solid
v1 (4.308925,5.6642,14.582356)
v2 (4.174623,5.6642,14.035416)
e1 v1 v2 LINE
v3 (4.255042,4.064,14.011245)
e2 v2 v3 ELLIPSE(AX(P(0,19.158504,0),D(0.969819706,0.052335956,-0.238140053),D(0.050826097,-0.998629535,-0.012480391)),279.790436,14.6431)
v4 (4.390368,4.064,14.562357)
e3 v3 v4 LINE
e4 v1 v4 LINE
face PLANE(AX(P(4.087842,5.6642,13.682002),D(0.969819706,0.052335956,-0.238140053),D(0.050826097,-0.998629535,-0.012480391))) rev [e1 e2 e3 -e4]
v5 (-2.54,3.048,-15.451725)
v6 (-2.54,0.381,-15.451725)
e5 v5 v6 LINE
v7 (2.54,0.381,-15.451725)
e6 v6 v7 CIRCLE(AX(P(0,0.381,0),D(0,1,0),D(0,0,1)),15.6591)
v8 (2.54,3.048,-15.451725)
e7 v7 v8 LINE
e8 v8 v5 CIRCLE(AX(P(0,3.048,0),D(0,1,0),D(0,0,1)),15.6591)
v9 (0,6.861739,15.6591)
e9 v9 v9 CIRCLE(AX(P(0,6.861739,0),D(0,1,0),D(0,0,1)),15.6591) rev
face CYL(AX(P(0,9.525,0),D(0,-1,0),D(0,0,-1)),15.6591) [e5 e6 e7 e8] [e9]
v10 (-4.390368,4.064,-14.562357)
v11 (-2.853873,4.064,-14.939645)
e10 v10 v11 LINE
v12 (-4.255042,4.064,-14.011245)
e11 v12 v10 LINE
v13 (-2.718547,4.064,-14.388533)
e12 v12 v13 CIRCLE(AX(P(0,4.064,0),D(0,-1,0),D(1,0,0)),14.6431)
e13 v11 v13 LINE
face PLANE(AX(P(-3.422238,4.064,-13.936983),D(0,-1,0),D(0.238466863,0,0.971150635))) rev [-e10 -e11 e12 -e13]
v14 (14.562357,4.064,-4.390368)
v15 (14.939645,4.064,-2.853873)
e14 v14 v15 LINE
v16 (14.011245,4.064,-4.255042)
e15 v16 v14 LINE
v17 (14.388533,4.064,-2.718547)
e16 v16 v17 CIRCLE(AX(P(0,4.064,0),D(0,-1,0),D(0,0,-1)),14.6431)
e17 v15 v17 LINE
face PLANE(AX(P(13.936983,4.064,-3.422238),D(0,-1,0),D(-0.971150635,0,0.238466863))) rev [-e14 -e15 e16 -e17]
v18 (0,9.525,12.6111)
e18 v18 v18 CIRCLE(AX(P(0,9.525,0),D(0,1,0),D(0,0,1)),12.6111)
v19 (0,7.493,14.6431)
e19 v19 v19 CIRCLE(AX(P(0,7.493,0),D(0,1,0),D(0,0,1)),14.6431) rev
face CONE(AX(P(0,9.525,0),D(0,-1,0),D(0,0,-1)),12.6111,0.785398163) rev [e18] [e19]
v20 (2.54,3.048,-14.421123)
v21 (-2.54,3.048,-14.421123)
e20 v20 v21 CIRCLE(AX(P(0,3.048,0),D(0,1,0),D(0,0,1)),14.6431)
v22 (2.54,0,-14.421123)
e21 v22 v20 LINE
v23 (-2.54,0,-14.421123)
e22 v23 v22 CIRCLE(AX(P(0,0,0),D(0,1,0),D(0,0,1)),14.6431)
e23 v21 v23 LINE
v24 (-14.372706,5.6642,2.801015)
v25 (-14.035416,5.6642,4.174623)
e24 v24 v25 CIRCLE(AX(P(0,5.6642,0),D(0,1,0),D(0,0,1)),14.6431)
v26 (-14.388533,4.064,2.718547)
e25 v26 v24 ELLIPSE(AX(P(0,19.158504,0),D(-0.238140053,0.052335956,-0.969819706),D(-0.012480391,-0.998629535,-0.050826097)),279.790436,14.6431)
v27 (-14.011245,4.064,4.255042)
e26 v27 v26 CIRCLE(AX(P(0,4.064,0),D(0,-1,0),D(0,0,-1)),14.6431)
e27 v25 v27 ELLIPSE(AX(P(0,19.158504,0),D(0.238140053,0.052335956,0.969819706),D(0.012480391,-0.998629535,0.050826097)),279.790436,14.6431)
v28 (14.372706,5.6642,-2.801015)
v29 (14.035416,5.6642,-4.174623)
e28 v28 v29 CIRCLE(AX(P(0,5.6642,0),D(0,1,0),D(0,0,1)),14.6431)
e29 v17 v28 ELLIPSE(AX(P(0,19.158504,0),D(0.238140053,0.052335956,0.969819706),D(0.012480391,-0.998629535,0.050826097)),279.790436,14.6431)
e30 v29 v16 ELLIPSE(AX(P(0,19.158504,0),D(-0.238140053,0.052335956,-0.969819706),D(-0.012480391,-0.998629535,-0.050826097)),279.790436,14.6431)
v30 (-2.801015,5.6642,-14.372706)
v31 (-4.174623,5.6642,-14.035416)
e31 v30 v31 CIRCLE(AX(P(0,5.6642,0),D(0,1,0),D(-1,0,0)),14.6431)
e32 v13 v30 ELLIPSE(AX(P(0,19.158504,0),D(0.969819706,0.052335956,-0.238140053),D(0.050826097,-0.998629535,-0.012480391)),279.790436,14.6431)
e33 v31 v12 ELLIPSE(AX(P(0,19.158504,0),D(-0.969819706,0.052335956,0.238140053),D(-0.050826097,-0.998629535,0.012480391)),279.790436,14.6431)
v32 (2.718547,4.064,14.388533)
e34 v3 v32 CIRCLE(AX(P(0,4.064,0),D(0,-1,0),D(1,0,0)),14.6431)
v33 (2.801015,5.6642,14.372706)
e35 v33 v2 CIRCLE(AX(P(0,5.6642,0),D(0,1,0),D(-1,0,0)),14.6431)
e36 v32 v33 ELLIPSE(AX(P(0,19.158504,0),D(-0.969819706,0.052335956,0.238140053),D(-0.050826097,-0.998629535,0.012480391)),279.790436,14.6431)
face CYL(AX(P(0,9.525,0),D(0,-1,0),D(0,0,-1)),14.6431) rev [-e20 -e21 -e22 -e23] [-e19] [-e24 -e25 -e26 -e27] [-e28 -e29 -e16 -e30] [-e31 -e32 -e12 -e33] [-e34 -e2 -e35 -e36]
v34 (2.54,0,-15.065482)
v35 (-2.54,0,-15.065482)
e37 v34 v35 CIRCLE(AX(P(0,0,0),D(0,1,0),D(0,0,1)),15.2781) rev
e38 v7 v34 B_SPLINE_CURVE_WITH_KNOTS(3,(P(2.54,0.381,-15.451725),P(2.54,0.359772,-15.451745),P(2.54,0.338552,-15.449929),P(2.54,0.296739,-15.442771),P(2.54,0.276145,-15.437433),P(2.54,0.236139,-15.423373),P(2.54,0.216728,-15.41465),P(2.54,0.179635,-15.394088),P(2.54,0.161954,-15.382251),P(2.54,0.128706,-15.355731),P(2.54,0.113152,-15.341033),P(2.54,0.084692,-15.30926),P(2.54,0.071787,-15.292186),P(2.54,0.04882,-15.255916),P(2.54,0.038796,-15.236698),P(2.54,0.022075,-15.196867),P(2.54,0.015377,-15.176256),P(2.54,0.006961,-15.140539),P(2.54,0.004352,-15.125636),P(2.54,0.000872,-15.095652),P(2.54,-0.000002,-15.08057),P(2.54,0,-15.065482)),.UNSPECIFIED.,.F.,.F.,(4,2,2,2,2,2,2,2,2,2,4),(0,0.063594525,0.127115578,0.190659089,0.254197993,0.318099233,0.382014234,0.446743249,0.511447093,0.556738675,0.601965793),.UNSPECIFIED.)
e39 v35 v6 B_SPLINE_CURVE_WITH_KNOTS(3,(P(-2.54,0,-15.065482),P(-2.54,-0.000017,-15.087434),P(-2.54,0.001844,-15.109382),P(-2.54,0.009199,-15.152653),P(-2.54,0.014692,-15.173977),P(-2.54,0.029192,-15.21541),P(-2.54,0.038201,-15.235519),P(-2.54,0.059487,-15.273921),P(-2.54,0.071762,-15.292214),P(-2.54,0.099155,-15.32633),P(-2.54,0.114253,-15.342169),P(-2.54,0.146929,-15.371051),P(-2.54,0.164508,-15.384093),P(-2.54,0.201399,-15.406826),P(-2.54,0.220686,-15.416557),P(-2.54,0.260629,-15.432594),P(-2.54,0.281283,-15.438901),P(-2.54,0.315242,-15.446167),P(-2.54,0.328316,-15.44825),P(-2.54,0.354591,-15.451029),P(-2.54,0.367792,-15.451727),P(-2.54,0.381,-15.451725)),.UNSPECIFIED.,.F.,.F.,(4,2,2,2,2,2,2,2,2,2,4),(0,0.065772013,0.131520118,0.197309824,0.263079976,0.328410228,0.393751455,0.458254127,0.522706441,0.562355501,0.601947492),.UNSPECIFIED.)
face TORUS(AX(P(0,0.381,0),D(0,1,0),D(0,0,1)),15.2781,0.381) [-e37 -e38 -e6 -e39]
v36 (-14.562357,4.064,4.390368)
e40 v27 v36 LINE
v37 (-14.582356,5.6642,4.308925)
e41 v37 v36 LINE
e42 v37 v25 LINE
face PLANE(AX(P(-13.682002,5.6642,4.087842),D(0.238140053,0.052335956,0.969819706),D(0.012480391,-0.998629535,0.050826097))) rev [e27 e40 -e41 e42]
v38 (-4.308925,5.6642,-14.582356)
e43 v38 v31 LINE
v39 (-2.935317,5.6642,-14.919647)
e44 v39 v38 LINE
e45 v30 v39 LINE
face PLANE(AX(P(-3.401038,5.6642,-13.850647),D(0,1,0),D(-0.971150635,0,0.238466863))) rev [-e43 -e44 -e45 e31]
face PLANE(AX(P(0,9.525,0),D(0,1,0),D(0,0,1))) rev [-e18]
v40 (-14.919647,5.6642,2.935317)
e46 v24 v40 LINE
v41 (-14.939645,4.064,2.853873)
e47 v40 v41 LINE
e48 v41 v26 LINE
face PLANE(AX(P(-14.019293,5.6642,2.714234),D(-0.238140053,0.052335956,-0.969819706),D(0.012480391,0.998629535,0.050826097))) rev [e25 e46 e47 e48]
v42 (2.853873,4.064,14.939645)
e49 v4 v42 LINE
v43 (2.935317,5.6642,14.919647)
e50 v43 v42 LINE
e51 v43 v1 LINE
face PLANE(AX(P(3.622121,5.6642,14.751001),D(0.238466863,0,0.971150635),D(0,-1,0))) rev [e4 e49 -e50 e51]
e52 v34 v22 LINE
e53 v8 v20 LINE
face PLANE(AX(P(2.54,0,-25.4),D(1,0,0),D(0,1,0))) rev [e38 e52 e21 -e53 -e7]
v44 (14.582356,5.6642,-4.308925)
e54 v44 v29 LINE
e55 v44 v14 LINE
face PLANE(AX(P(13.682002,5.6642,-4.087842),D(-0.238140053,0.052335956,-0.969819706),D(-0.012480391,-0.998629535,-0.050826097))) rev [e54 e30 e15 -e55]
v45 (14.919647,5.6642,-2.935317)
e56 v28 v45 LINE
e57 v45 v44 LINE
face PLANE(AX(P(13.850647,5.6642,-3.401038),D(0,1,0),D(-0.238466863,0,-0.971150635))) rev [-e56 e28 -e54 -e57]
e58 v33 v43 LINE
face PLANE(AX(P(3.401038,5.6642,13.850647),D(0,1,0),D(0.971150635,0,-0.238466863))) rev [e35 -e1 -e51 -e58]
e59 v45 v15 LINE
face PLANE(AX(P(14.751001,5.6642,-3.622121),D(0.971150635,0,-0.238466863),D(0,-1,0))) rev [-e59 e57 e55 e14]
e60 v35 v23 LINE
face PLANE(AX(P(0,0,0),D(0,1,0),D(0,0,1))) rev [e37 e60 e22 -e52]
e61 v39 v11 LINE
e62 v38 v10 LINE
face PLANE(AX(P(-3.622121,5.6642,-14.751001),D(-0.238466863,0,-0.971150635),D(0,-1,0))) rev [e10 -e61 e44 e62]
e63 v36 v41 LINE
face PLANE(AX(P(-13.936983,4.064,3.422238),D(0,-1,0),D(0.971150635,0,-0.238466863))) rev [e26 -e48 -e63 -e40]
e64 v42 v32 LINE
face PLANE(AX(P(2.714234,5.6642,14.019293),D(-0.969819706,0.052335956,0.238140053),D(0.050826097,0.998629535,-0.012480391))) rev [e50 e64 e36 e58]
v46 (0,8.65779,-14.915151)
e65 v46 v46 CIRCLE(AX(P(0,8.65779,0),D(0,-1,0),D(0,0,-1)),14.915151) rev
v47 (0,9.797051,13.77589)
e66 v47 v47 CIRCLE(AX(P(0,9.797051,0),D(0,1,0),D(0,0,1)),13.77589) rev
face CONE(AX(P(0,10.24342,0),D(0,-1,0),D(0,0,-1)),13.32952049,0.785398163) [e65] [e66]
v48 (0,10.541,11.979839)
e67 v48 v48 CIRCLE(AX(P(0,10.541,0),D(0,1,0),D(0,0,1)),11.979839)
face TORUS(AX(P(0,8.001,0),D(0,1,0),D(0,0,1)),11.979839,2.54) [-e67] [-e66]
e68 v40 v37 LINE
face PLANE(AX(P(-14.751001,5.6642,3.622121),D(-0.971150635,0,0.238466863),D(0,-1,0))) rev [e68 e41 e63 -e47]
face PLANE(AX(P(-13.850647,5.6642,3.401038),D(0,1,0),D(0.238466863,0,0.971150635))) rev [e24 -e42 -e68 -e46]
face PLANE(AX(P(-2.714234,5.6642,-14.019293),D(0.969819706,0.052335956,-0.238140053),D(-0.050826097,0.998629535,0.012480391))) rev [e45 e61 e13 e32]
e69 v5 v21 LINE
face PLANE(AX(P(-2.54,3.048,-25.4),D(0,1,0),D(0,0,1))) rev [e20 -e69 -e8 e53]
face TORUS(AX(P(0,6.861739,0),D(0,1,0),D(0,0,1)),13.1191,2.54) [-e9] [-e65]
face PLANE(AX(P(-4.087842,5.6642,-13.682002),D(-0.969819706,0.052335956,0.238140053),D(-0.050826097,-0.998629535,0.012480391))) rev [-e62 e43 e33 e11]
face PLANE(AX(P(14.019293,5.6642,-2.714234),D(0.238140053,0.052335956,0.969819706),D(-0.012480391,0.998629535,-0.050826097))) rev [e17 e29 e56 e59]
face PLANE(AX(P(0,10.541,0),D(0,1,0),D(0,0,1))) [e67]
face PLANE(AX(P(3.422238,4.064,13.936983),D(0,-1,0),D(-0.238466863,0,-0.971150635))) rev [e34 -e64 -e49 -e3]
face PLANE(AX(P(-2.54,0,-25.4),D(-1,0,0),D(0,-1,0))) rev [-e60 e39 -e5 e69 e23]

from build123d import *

# Parameters (mm, degrees)
SKETCH1_R           = 14.6431
BOSS_EXTRUDE1_DEPTH = 9.525
FILLET1_SIZE        = 2.032
SHELL1_T            = 1.016
SKETCH2_W           = 5.08
SKETCH2_H           = 3.048
CUT_EXTRUDE1_DEPTH  = 25.4
FILLET2_R           = 0.381
SNAP_START          = -15.1892
SNAP_GROOVE1_DEPTH  = 0.567483728
CIRPATTERN2_COUNT   = 4
FILLET3_R           = 2.54
FILLET4_R           = 2.54


# Read off the part's stored shape, not the designer's step: Snap Groove1
with BuildPart() as part:
    # Sketch1 → Boss-Extrude1 (new body)
    with BuildSketch(Plane(origin=(0, 0, 0), x_dir=(1, 0, 0), z_dir=(0, 1, 0))):
        with Locations(Location((0, 0, 0), (0, 0, 90))):
            Circle(SKETCH1_R)
    extrude(amount=BOSS_EXTRUDE1_DEPTH)

    # Fillet1
    fillet1_edges = [part.edges().sort_by_distance(p)[0] for p in [
        (0, 9.525, 14.6431),
    ]]
    chamfer(fillet1_edges, length=FILLET1_SIZE)

    # Shell1
    shell1_openings = [part.faces().sort_by_distance(p)[0] for p in [
        (0, 0, 0),
    ]]
    offset(amount=SHELL1_T, openings=shell1_openings, kind=Kind.INTERSECTION)

    # Sketch2 → Cut-Extrude1 (cut)
    with BuildSketch(Plane.XY):
        with Locations((0, 1.524)):
            Rectangle(SKETCH2_W, SKETCH2_H)
    extrude(amount=-CUT_EXTRUDE1_DEPTH, mode=Mode.SUBTRACT)

    # Fillet2
    fillet2_edges = [part.edges().sort_by_distance(p)[0] for p in [
        (0, 0, 15.6591),
    ]]
    fillet(fillet2_edges, radius=FILLET2_R)

    # Snap Groove1 outline → Snap Groove1 (cut)
    with BuildSketch(Plane(origin=(0, 0, 0), x_dir=(0.9711506345911166, 0, -0.23846686338623996), z_dir=(0.23846686338623993, 0, 0.9711506345911166)).offset(SNAP_START)):
        Polygon((-0.707206527, 5.6642), (-0.791069456, 4.064), (0.791069456, 4.064), (0.707206527, 5.6642), align=None)
    snap_groove1 = extrude(amount=SNAP_GROOVE1_DEPTH, mode=Mode.SUBTRACT)

    # CirPattern2: Snap Groove1 ×4 about axis
    cirpattern2_axis = Axis((0, 0, 0), (0, 1, 0))
    for i in range(1, CIRPATTERN2_COUNT):
        add(snap_groove1.rotate(cirpattern2_axis, i * 360 / CIRPATTERN2_COUNT), mode=Mode.SUBTRACT)

    # Fillet3
    fillet3_edges = [part.edges().sort_by_distance(p)[0] for p in [
        (0, 7.913840979, 15.6591),
    ]]
    fillet(fillet3_edges, radius=FILLET3_R)

    # Fillet4
    fillet4_edges = [part.edges().sort_by_distance(p)[0] for p in [
        (0, 10.541, 13.031940979),
    ]]
    fillet(fillet4_edges, radius=FILLET4_R)


solid = part.part
